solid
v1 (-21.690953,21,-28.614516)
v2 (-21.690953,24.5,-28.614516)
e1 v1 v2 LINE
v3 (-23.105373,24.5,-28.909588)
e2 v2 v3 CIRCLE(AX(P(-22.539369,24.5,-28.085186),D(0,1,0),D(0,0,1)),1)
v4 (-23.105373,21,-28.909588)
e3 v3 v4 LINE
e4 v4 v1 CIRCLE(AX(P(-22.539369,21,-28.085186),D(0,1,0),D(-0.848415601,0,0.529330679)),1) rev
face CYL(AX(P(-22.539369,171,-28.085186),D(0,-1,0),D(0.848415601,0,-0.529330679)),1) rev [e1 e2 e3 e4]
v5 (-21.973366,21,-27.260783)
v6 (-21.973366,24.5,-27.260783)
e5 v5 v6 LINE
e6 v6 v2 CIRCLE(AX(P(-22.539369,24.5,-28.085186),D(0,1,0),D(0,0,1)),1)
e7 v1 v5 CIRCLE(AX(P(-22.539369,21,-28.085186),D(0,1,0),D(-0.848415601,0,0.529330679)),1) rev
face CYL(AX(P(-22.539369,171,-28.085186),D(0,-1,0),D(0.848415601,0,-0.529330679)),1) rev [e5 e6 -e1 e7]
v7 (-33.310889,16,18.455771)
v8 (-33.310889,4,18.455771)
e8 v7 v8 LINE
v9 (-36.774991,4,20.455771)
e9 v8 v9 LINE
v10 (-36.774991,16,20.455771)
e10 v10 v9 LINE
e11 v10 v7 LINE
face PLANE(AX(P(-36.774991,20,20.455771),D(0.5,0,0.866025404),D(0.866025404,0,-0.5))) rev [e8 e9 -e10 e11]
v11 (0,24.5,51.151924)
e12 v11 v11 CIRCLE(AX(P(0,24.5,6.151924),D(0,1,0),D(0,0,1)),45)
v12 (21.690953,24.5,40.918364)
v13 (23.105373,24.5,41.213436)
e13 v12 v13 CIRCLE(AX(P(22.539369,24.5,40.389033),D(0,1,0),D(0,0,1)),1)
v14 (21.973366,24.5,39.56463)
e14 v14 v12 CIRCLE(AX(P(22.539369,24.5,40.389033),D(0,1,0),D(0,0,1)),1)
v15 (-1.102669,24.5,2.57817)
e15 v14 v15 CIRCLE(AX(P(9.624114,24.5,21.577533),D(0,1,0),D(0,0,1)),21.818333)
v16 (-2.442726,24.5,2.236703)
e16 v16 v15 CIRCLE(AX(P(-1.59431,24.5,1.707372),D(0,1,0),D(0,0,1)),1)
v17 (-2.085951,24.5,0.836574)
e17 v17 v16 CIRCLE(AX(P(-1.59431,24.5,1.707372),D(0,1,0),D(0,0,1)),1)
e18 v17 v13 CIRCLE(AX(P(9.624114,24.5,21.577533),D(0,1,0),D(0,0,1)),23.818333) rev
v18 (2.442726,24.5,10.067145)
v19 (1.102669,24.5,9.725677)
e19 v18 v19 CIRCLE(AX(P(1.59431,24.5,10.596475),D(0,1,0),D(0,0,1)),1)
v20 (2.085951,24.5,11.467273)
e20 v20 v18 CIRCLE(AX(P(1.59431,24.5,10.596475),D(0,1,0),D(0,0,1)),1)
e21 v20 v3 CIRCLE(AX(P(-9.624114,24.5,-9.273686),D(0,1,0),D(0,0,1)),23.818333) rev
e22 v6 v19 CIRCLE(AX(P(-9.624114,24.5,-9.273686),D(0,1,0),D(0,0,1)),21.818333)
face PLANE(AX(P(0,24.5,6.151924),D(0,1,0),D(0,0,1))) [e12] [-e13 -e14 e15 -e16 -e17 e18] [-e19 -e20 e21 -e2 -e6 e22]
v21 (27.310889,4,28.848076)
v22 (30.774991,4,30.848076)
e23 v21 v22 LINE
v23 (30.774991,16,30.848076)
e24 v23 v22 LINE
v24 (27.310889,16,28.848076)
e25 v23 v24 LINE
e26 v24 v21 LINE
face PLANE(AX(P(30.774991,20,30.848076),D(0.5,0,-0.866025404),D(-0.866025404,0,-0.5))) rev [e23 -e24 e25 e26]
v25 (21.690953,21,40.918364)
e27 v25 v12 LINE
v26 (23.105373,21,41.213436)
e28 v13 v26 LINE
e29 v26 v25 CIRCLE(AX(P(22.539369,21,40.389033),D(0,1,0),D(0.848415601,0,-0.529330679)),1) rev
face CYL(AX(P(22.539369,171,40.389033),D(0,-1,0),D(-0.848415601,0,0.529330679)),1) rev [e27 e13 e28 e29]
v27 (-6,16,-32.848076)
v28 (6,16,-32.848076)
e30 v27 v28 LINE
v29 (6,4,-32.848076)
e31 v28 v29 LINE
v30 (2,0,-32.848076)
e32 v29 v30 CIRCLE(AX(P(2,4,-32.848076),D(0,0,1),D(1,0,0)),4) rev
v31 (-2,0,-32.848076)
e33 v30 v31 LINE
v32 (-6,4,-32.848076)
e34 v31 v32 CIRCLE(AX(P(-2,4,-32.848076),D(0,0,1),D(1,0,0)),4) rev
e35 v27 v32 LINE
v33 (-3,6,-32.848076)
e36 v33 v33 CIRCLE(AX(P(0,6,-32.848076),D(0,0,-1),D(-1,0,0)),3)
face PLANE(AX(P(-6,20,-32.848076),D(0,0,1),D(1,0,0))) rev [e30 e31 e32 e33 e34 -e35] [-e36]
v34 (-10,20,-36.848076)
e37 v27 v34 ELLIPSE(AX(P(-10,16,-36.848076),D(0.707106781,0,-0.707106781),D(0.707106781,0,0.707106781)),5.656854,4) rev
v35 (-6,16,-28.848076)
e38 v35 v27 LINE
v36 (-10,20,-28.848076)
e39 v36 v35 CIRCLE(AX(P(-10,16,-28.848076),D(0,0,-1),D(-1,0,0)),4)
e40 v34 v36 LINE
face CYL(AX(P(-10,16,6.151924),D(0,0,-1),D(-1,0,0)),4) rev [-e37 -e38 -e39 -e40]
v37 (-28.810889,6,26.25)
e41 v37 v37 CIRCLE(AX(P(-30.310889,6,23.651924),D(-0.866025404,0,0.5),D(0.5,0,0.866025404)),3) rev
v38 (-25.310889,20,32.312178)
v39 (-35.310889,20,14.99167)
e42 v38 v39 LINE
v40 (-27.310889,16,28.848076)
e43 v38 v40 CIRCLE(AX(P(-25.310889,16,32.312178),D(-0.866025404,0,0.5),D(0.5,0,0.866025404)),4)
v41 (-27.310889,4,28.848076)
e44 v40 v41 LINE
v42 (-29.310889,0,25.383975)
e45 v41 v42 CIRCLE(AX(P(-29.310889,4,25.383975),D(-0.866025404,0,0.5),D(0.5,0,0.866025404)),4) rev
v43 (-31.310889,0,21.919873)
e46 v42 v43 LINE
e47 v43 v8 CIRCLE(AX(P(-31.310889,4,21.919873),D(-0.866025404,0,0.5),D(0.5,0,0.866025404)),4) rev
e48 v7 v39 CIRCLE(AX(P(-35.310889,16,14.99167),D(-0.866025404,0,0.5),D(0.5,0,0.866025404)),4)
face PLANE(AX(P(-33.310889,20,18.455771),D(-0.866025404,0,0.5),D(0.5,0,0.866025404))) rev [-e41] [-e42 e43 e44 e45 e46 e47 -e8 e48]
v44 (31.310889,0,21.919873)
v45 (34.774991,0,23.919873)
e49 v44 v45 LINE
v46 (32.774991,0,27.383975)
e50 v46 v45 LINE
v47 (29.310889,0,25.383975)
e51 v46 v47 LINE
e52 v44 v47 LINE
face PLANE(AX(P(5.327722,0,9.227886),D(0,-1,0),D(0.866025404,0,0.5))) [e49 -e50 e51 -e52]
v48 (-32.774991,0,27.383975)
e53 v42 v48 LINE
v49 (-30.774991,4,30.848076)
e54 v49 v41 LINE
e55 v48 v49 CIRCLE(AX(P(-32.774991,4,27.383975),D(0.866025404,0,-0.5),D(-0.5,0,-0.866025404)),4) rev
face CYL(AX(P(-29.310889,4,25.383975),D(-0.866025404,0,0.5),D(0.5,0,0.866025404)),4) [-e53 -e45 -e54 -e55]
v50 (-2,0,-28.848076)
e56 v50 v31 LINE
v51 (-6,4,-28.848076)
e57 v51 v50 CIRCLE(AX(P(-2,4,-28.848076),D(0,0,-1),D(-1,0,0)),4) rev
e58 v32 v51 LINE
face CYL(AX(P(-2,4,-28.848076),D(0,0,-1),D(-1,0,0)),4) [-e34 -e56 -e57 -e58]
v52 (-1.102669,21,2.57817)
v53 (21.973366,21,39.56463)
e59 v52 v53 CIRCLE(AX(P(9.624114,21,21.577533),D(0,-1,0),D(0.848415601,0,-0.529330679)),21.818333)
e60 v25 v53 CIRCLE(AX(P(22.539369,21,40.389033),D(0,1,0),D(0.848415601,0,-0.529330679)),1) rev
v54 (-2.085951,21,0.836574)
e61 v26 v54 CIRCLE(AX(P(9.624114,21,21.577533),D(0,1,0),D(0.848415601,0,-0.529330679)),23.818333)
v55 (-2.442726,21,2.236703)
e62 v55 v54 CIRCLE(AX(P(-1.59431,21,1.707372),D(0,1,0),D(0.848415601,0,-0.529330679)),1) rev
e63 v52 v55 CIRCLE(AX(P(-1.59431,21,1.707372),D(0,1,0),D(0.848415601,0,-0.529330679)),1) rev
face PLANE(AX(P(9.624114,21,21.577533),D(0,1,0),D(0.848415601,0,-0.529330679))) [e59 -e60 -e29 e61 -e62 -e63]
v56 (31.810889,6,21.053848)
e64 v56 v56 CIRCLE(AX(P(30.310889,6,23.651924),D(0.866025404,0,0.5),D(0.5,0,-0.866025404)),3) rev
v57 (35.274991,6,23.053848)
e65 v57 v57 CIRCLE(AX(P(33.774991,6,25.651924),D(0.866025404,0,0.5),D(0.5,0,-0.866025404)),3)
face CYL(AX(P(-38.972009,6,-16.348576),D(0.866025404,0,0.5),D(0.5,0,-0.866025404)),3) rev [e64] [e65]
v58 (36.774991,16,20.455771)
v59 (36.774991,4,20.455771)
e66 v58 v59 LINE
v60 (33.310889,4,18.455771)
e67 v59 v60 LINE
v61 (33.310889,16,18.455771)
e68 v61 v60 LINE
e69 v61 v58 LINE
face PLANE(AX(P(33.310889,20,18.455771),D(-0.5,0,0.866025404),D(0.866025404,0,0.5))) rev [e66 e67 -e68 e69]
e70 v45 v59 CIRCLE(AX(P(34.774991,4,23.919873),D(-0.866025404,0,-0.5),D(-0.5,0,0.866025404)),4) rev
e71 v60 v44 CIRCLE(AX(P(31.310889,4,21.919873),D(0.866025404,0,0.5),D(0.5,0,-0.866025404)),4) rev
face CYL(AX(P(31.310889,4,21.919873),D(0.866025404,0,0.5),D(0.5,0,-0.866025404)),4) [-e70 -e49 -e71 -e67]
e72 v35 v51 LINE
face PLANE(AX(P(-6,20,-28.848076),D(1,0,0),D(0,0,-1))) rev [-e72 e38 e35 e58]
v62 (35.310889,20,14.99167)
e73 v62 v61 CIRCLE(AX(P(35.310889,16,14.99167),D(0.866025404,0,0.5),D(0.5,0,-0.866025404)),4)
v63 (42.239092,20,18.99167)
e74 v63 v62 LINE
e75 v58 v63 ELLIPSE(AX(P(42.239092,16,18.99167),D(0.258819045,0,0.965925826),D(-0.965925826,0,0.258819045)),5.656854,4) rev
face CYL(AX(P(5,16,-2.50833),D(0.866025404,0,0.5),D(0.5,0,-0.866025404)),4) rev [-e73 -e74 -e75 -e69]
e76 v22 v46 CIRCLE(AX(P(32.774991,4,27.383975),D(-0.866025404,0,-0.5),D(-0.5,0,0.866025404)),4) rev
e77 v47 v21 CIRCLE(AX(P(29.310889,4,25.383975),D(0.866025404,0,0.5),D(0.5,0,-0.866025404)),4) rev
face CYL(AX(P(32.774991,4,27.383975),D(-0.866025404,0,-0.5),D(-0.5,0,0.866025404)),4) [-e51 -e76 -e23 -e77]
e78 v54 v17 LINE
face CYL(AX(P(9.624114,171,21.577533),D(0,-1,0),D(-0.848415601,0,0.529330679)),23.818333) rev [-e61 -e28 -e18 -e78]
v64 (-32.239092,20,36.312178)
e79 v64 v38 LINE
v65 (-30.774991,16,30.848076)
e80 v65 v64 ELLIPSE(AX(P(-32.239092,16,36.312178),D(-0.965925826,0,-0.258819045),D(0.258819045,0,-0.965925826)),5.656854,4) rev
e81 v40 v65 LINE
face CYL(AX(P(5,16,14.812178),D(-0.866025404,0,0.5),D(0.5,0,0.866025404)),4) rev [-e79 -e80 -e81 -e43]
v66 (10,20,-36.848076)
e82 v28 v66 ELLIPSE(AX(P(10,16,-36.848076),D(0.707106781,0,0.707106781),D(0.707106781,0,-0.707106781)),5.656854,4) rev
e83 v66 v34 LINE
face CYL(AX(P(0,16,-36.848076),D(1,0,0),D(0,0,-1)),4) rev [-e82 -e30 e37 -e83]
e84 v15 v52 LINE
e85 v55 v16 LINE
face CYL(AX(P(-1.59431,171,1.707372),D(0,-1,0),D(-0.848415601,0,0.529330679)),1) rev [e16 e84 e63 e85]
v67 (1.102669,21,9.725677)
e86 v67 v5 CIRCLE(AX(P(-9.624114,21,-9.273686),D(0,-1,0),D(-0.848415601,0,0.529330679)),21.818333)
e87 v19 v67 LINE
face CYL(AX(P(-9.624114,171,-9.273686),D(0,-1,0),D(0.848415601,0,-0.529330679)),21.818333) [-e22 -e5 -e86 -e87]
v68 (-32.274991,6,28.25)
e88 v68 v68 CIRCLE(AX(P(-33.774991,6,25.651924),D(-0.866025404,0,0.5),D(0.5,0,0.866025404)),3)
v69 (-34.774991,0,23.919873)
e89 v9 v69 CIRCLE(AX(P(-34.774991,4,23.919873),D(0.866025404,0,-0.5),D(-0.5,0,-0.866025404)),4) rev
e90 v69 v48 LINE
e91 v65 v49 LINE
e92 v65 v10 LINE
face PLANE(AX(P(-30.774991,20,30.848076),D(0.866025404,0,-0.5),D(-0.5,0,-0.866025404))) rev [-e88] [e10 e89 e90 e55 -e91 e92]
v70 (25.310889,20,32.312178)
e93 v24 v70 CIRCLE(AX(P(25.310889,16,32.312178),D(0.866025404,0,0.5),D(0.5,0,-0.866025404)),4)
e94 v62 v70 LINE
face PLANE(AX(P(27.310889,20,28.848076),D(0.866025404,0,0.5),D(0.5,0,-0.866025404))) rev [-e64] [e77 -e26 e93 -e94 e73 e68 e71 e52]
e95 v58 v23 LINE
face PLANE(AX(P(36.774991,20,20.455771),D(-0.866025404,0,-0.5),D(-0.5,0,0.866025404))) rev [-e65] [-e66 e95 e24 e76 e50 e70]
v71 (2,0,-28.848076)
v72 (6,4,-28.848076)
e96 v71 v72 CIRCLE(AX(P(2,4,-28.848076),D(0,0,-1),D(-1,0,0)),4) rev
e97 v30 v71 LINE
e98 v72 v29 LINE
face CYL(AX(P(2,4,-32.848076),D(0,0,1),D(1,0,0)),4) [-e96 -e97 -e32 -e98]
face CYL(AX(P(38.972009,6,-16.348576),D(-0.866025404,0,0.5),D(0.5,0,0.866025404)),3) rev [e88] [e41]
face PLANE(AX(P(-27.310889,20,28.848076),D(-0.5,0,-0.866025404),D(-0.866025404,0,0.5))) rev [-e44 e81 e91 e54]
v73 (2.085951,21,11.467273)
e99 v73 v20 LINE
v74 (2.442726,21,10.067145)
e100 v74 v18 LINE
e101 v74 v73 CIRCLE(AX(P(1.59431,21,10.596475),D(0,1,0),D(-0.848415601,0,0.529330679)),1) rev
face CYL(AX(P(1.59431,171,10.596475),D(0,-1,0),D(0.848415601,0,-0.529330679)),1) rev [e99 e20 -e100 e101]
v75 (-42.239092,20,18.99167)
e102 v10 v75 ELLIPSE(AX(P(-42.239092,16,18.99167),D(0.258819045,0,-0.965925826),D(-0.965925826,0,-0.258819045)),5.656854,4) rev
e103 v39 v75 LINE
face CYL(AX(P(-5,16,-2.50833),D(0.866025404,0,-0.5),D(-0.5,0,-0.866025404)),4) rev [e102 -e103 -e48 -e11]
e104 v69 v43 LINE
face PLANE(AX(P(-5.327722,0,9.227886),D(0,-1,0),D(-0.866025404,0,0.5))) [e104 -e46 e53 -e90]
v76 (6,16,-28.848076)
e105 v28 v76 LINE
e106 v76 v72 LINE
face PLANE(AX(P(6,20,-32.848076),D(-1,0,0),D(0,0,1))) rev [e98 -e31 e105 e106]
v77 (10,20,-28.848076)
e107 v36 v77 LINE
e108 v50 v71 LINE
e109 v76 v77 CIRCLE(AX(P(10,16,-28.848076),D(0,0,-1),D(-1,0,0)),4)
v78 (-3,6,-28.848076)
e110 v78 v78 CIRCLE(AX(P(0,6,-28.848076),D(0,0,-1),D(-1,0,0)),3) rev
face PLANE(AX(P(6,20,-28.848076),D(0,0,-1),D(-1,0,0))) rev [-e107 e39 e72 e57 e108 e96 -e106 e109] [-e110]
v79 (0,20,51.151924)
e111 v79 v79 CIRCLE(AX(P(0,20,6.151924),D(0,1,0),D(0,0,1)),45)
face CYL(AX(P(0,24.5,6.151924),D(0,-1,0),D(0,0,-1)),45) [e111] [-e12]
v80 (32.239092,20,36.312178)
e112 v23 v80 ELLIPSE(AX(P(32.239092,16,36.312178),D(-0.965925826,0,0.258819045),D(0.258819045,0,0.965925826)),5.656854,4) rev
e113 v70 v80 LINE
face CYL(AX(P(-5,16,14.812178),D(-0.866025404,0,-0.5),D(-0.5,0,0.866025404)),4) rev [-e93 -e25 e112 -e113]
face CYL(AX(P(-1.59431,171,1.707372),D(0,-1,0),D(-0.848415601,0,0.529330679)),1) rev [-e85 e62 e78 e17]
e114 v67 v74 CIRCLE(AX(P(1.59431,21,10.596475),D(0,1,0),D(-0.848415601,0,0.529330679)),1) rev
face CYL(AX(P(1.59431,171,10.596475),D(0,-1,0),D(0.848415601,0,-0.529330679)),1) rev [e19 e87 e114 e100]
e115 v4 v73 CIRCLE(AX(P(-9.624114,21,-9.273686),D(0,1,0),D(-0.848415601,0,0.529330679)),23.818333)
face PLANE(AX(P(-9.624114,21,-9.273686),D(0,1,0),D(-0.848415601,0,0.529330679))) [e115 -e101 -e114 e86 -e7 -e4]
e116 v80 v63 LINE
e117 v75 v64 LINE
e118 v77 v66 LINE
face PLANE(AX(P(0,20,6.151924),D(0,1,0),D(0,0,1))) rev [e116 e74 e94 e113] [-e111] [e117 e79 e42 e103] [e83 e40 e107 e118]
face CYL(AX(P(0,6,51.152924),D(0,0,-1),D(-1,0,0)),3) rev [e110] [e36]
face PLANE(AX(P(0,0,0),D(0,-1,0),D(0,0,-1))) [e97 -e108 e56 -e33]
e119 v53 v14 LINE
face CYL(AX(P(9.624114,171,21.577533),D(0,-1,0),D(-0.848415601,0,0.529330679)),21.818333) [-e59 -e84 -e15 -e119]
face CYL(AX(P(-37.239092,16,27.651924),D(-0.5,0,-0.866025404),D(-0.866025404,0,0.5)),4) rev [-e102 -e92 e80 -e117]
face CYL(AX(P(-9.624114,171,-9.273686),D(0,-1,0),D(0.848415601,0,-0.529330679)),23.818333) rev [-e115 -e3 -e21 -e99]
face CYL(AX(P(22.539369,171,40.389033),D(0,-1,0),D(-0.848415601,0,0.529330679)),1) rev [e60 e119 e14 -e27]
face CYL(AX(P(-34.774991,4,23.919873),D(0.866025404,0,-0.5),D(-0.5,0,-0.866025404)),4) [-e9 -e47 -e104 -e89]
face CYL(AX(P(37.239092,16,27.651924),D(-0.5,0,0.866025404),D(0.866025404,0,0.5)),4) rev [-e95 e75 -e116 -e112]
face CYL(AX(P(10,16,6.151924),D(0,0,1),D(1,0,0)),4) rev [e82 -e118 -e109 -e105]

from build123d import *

# Parameters (mm, degrees)
SKETCH2_W                = 12
SKETCH2_H                = 4
BOSS_EXTRUDE2_DEPTH      = 20
SKETCH4_R                = 45
BOSS_EXTRUDE3_DEPTH      = 4.5
FILLET1_R                = 4
CUT_EXTRUDE1_REACH       = 100.393
SKETCH5_R                = 3
FILLET2_R                = 4
CIRPATTERN5_COUNT        = 3
FILLET1_OF_CIRPATTERN5_R = 4
FILLET2_OF_CIRPATTERN5_R = 4
CAVITY1_START            = 21
CAVITY1_DEPTH            = 3.5
CAVITY2_START            = 21
CAVITY2_DEPTH            = 3.5


# Read off the part's stored shape, not the designer's step: Cavity1, Cavity2
with BuildPart() as part:
    # Sketch2 → Boss-Extrude2 (new body)
    with BuildSketch(Plane(origin=(0, 0, 0), x_dir=(1, 0, 0), z_dir=(0, 1, 0))):
        with Locations((0, 30.848076211)):
            Rectangle(SKETCH2_W, SKETCH2_H)
    boss_extrude2 = extrude(amount=BOSS_EXTRUDE2_DEPTH)

    # Sketch4 → Boss-Extrude3 (add)
    with BuildSketch(Plane(origin=(0, 20, 0), x_dir=(1, 0, 0), z_dir=(0, 1, 0))):
        with Locations(Location((0, -6.151923789, 0), (0, 0, 270))):
            Circle(SKETCH4_R)
    extrude(amount=BOSS_EXTRUDE3_DEPTH)

    # Fillet1
    fillet1_edges = [part.edges().sort_by_distance(p)[0] for p in [
        (-6, 20, -30.848076211),
        (6, 20, -30.848076211),
        (0, 20, -32.848076211),
    ]]
    fillet(fillet1_edges, radius=FILLET1_R)

    # Sketch5 → Cut-Extrude1 (cut, up to next)
    with BuildSketch(Plane(origin=(0, 0, -32.848076211), x_dir=(-1, 0, 0), z_dir=(0, 0, -1)), mode=Mode.PRIVATE) as cut_extrude1_sk1:
        with Locations((0, 6)):
            Circle(SKETCH5_R)
    cut_extrude1_tool1 = extrude(cut_extrude1_sk1.sketch, amount=-CUT_EXTRUDE1_REACH, mode=Mode.PRIVATE) & part.part
    cut_extrude1 = cut_extrude1_tool1.solids().sort_by_distance((0, 6, -32.848076))[0]
    add(cut_extrude1, mode=Mode.SUBTRACT)

    # Fillet2
    fillet2_edges = [part.edges().sort_by_distance(p)[0] for p in [
        (-6, 0, -30.848076211),
        (6, 0, -30.848076211),
    ]]
    fillet(fillet2_edges, radius=FILLET2_R)

    # CirPattern5: Boss-Extrude2, Cut-Extrude1 ×3 about axis
    cirpattern5_axis = Axis((0, 0, 6.151923789), (0, 1, 0))
    add([boss_extrude2.rotate(cirpattern5_axis, i * 360 / CIRPATTERN5_COUNT) for i in range(1, CIRPATTERN5_COUNT)])
    add([cut_extrude1.rotate(cirpattern5_axis, i * 360 / CIRPATTERN5_COUNT) for i in range(1, CIRPATTERN5_COUNT)], mode=Mode.SUBTRACT)

    # Fillet1 of CirPattern5
    fillet1_of_cirpattern5_edges = [part.edges().sort_by_distance(p)[0] for p in [
        (-29.04293994, 20, 29.848076211),
        (-35.04293994, 20, 19.455771366),
        (-33.774990748, 20, 25.651923789),
        (35.04293994, 20, 19.455771366),
        (29.04293994, 20, 29.848076211),
        (33.774990748, 20, 25.651923789),
    ]]
    fillet(fillet1_of_cirpattern5_edges, radius=FILLET1_OF_CIRPATTERN5_R)

    # Fillet2 of CirPattern5
    fillet2_of_cirpattern5_edges = [part.edges().sort_by_distance(p)[0] for p in [
        (-29.04293994, 0, 29.848076211),
        (-35.04293994, 0, 19.455771366),
        (35.04293994, 0, 19.455771366),
        (29.04293994, 0, 29.848076211),
    ]]
    fillet(fillet2_of_cirpattern5_edges, radius=FILLET2_OF_CIRPATTERN5_R)

    # Cavity1 outline → Cavity1 (cut)
    with BuildSketch(Plane(origin=(0, 0, 0), x_dir=(1, 0, 0), z_dir=(0, 1, 0)).offset(CAVITY1_START)):
        with BuildLine():
            ThreePointArc((2.442725539, -10.067144534), (1.841235151, -9.627440673), (1.102669127, -9.725677123))
            ThreePointArc((1.102669127, -9.725677123), (-28.135128354, -2.275427339), (-21.973365635, 27.260782702))
            ThreePointArc((-21.973365635, 27.260782702), (-21.560444182, 27.88096497), (-21.690953471, 28.614516261))
            ThreePointArc((-21.690953471, 28.614516261), (-22.33514846, 29.064110473), (-23.10537251, 28.909588462))
            ThreePointArc((-23.10537251, 28.909588462), (-29.831959556, -3.334088698), (2.085950749, -11.467273303))
            ThreePointArc((2.085950749, -11.467273303), (2.563344478, -10.843400426), (2.442725539, -10.067144534))
        make_face()
    extrude(amount=CAVITY1_DEPTH, mode=Mode.SUBTRACT)

    # Cavity2 outline → Cavity2 (cut)
    with BuildSketch(Plane(origin=(0, 0, 0), x_dir=(1, 0, 0), z_dir=(0, 1, 0)).offset(CAVITY2_START)):
        with BuildLine():
            ThreePointArc((-2.442725539, -2.236703043), (-1.841235151, -2.676406904), (-1.102669127, -2.578170454))
            ThreePointArc((-1.102669127, -2.578170454), (28.135128354, -10.028420238), (21.973365635, -39.564630279))
            ThreePointArc((21.973365635, -39.564630279), (21.560444182, -40.184812547), (21.690953471, -40.918363839))
            ThreePointArc((21.690953471, -40.918363839), (22.33514846, -41.36795805), (23.10537251, -41.213436039))
            ThreePointArc((23.10537251, -41.213436039), (29.831959556, -8.96975888), (-2.085950749, -0.836574274))
            ThreePointArc((-2.085950749, -0.836574274), (-2.563344478, -1.460447151), (-2.442725539, -2.236703043))
        make_face()
    extrude(amount=CAVITY2_DEPTH, mode=Mode.SUBTRACT)


solid = part.part
